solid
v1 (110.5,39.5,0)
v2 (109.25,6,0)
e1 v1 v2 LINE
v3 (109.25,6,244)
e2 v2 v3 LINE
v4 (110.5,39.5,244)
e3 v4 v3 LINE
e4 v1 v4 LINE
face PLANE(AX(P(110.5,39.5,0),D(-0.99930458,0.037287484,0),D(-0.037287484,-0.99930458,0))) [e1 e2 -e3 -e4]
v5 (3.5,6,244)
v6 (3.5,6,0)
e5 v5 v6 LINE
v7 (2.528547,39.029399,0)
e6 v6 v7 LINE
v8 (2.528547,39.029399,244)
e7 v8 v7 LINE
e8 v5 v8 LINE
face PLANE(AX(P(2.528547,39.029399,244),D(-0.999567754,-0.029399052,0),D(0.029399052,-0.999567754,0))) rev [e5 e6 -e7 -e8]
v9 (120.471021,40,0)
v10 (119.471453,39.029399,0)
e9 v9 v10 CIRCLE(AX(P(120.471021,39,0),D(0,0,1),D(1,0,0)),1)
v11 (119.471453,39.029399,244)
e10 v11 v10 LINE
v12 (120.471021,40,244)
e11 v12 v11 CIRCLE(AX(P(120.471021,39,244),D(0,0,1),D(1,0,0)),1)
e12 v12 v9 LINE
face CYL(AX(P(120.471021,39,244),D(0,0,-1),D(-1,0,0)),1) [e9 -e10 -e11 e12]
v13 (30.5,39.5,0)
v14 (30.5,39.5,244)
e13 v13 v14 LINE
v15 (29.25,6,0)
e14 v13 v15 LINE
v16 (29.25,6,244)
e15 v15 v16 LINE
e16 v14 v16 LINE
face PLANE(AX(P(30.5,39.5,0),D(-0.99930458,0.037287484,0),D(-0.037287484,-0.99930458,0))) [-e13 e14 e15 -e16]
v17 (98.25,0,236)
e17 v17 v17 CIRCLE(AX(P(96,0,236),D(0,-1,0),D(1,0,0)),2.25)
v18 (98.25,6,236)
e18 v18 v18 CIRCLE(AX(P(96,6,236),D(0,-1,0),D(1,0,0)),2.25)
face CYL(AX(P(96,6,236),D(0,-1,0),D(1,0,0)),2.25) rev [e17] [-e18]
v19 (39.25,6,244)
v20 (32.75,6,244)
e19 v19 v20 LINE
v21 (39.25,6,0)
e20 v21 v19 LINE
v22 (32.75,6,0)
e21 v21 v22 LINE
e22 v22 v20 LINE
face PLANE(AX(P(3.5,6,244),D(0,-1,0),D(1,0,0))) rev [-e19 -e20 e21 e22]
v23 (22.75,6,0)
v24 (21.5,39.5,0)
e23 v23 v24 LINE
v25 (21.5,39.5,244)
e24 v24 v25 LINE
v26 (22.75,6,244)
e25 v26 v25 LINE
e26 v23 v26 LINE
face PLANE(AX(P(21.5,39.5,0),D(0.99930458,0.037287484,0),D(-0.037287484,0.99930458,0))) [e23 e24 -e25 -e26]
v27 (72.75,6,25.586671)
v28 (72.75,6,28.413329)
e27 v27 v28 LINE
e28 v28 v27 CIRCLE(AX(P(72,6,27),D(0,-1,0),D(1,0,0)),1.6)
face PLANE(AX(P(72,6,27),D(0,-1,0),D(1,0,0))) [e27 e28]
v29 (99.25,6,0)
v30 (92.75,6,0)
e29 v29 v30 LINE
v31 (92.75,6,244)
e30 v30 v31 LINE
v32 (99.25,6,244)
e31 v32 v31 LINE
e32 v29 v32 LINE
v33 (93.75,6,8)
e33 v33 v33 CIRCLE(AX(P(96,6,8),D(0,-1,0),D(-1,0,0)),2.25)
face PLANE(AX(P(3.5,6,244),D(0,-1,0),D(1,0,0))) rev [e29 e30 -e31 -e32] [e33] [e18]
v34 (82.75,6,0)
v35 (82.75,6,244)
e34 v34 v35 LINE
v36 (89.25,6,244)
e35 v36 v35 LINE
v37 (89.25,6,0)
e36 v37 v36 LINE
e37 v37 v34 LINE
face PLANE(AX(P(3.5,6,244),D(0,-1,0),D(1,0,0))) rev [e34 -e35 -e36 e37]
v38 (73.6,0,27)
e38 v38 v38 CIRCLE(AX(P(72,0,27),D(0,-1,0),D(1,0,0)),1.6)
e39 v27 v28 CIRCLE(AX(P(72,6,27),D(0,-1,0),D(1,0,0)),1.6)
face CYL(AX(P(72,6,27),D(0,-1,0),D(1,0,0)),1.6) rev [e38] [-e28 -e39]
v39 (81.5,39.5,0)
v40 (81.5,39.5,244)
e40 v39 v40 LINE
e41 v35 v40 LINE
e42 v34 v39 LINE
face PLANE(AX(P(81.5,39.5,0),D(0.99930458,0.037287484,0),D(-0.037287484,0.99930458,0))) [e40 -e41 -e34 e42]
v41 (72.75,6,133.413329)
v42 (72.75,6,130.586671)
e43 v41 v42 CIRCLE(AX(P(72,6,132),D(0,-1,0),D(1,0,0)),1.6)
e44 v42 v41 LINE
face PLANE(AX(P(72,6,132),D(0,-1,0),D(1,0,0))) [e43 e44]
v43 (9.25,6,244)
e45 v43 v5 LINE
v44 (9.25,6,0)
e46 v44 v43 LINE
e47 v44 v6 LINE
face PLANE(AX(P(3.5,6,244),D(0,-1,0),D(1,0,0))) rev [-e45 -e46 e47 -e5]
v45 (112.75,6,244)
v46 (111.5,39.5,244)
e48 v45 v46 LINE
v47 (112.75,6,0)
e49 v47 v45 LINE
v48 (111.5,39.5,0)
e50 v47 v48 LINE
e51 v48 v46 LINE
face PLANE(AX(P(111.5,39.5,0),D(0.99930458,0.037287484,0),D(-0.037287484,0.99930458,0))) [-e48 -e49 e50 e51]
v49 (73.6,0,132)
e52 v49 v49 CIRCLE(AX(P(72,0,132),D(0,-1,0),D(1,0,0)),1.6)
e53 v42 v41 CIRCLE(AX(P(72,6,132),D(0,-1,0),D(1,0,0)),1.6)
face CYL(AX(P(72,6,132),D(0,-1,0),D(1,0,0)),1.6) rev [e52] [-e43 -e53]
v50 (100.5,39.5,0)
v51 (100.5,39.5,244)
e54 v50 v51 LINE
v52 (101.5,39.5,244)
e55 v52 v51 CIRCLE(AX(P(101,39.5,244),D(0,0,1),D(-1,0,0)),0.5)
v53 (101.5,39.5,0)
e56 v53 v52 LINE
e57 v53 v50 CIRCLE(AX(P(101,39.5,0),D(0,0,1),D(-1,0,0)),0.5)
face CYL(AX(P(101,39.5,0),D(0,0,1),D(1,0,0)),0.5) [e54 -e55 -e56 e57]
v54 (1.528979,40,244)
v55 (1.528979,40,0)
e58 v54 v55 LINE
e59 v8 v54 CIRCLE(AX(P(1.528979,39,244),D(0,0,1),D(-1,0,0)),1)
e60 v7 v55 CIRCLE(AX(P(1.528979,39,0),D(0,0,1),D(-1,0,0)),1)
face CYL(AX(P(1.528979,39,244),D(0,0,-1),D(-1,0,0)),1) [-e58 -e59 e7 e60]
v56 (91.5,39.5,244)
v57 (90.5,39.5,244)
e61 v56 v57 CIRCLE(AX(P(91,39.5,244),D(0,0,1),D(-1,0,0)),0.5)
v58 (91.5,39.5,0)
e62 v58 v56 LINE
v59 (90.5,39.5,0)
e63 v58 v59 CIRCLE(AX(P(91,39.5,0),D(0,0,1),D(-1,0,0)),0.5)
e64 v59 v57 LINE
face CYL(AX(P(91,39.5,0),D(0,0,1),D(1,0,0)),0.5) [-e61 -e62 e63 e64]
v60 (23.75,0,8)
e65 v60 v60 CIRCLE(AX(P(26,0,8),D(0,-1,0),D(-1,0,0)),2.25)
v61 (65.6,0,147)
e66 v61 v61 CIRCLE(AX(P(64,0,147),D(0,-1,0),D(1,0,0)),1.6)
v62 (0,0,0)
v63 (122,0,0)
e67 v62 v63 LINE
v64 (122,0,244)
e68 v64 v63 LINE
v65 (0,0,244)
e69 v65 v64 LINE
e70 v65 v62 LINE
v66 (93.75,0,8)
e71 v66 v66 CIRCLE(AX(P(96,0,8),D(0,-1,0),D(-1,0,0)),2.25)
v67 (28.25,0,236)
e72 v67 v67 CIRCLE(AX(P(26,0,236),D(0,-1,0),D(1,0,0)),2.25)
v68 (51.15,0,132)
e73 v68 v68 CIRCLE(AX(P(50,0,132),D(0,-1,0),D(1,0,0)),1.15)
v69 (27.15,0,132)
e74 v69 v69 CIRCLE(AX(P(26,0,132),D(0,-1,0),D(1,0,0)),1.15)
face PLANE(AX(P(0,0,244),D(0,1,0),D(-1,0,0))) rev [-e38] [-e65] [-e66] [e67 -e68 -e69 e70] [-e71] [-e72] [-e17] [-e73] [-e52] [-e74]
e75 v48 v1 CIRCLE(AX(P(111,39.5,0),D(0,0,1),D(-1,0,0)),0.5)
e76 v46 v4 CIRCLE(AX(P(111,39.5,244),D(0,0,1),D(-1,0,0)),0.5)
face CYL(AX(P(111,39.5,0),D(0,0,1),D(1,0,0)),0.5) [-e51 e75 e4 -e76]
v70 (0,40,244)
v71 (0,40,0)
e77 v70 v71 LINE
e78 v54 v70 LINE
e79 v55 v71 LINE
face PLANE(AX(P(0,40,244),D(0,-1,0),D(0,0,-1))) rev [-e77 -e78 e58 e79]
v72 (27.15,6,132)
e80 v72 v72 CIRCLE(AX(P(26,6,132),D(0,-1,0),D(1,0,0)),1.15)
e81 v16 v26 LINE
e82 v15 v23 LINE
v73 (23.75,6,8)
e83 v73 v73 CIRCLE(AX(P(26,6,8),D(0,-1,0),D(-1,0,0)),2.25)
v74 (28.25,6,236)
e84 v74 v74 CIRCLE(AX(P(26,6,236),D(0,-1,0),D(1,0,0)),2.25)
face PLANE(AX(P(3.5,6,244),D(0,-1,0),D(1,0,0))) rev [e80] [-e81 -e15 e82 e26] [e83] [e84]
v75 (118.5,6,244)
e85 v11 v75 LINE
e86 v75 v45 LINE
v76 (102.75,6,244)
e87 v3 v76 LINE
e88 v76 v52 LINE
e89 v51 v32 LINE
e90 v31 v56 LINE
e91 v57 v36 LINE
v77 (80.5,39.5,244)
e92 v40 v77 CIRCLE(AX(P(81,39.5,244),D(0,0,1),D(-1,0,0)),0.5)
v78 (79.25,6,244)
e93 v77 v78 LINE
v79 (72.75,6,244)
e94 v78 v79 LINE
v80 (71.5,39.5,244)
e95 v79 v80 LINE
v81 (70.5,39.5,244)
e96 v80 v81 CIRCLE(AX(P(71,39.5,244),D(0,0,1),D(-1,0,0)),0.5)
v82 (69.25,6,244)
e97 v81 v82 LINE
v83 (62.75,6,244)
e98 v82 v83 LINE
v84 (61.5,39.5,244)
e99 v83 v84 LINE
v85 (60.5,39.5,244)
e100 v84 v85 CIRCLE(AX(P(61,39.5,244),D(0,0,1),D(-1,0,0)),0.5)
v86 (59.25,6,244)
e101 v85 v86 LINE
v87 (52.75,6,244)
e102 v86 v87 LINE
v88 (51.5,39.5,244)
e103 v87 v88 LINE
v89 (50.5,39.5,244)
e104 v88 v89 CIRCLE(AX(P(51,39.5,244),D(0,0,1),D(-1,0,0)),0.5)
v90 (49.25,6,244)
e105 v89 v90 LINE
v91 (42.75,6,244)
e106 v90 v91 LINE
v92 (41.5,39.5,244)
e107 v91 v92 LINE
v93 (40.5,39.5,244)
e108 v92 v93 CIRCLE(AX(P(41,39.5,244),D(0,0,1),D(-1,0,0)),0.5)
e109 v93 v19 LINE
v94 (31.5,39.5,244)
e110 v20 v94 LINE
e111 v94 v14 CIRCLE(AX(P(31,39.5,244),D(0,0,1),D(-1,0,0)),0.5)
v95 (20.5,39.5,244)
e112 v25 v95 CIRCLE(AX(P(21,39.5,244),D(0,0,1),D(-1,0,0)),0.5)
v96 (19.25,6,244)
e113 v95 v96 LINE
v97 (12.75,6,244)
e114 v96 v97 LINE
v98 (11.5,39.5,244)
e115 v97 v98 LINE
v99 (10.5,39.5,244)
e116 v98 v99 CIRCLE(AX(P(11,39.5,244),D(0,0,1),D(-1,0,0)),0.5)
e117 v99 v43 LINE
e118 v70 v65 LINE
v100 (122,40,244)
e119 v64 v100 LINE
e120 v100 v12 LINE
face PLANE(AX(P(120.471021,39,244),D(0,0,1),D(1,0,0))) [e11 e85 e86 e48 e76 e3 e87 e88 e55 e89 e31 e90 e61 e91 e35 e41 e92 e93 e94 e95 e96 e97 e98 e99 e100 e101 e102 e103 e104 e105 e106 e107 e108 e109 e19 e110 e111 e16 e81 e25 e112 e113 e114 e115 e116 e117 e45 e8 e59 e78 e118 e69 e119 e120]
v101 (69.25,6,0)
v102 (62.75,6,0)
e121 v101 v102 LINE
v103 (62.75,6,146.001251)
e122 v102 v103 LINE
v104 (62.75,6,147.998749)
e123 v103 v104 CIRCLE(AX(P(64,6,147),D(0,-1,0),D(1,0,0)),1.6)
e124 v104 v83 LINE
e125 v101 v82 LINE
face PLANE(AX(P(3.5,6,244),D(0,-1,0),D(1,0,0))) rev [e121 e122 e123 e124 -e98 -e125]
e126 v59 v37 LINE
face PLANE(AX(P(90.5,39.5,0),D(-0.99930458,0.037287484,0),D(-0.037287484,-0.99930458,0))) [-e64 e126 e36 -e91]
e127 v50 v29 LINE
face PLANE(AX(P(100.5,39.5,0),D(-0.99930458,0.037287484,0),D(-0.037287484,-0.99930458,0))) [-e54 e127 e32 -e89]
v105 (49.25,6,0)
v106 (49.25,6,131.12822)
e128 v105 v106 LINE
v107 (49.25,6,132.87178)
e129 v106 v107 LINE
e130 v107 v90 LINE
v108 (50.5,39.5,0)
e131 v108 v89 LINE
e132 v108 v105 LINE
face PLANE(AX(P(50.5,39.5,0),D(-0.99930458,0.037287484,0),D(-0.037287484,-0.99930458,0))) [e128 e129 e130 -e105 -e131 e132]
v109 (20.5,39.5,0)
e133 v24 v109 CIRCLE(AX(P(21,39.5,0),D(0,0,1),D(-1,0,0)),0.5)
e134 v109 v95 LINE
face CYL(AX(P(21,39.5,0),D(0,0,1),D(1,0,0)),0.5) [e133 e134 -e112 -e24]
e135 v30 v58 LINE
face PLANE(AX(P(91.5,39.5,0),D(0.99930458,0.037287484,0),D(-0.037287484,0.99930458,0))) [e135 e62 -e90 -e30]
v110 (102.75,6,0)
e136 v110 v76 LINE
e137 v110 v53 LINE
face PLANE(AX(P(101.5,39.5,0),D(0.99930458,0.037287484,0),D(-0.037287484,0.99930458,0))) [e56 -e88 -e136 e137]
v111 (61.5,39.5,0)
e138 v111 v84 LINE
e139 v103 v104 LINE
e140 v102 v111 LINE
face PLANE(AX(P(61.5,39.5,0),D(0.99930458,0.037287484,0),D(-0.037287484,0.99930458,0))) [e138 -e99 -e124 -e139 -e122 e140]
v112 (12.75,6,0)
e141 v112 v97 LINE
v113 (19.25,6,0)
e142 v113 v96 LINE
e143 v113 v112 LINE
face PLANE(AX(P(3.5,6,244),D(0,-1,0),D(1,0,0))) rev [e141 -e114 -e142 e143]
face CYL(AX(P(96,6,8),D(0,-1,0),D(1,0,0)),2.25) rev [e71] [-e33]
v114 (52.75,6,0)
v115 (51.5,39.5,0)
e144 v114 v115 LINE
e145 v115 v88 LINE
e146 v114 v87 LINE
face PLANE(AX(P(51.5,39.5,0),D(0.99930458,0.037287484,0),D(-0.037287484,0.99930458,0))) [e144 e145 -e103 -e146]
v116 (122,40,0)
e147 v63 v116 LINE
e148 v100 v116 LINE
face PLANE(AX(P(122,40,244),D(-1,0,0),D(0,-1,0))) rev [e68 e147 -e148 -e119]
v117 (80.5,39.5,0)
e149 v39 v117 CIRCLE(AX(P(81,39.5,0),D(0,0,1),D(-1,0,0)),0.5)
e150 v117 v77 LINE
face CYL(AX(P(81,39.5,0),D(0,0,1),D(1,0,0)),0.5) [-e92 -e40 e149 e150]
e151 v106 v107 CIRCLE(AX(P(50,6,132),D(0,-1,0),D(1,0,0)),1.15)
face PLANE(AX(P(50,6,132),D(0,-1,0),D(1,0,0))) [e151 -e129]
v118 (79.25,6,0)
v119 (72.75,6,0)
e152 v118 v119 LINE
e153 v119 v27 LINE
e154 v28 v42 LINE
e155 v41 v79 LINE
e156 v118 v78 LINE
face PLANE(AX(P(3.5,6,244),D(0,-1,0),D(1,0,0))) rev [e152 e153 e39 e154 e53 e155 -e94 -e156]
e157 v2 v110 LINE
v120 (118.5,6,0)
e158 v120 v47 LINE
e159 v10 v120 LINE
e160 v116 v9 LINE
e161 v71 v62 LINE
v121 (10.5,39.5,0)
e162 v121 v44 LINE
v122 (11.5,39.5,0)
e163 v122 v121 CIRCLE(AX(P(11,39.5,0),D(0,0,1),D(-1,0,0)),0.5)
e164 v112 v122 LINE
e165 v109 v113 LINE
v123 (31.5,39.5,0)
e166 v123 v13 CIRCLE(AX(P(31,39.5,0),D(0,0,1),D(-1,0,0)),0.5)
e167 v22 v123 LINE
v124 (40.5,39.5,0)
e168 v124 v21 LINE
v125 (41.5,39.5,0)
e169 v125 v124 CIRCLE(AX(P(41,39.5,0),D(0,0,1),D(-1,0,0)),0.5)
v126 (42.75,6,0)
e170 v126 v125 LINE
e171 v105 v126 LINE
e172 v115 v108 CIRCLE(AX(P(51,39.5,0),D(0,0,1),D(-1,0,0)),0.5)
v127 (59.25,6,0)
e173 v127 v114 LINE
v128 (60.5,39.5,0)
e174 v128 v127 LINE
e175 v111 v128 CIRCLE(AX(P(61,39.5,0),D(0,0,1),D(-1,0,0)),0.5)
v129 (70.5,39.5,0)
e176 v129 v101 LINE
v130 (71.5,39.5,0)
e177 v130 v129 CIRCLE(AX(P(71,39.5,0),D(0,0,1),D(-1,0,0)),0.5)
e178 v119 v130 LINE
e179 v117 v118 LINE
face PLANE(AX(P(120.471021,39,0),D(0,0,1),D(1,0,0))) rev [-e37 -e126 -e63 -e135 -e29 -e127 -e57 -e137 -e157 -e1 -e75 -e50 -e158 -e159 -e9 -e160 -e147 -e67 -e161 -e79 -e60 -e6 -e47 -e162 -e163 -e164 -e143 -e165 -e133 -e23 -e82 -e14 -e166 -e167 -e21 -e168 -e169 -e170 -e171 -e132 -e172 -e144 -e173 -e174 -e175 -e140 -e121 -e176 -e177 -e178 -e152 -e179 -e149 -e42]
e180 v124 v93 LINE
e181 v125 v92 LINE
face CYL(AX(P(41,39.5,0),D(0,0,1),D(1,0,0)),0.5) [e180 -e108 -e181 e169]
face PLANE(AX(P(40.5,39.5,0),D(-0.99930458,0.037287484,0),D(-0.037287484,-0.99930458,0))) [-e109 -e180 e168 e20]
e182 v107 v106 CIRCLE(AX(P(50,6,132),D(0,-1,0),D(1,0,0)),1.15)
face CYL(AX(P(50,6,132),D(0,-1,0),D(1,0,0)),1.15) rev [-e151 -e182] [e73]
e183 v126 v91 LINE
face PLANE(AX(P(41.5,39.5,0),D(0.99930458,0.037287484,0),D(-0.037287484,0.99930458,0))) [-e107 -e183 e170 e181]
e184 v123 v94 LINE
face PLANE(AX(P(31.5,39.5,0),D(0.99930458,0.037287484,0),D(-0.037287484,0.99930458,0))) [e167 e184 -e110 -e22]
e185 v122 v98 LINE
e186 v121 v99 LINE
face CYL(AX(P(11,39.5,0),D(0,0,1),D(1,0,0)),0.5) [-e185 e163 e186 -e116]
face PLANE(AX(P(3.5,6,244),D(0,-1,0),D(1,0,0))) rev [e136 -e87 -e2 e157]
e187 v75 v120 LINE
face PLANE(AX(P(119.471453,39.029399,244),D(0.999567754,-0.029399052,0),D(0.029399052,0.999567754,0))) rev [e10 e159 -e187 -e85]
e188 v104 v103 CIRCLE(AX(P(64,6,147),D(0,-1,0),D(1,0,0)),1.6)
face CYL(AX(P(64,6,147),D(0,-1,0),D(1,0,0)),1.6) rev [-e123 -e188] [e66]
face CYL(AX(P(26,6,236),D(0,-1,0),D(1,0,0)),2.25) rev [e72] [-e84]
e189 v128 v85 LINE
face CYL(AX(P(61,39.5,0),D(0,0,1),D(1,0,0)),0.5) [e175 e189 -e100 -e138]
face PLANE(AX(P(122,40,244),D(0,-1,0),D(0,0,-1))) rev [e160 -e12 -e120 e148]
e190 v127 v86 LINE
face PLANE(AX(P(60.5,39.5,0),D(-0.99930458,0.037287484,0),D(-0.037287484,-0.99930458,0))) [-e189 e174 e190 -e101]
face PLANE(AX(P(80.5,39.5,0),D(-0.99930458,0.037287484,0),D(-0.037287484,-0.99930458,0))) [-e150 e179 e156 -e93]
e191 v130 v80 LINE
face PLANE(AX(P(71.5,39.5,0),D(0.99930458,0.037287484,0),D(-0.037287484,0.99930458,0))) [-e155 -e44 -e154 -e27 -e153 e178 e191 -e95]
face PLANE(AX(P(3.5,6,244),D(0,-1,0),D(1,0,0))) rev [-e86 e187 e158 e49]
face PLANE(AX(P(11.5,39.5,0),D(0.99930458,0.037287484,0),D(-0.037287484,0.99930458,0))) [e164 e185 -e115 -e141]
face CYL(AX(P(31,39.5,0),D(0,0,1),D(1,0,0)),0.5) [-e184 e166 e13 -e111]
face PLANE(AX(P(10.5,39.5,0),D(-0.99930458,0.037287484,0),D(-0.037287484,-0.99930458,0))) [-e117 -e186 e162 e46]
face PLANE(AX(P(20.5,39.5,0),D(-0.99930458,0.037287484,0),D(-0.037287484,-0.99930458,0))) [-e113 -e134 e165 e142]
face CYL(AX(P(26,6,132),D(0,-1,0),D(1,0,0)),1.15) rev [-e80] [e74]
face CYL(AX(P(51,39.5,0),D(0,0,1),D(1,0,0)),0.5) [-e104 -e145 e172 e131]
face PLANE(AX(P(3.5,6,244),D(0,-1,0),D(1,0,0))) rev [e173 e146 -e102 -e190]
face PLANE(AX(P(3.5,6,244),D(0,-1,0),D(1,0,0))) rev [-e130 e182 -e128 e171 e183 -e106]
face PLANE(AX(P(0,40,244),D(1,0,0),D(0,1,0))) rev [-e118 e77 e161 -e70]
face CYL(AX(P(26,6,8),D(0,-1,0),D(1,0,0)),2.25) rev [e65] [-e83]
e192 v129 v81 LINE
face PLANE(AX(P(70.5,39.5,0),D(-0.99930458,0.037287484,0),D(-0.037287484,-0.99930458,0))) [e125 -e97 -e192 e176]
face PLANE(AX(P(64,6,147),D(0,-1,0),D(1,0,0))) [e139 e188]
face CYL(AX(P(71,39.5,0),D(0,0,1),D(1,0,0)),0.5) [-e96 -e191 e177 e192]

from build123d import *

# Parameters (mm, degrees)
EXTRUDE_1_DEPTH       = 244
EXTRUDE_3_DEPTH       = 244
PATTERN_CURVE_1_COUNT = 11
PATTERN_CURVE_1_PITCH = 10
SKETCH_3_R            = 2.25
CUT_EXTRUDE_1_DEPTH   = 6
SKETCH_4_R            = 1.6
SKETCH_4_R_2          = 1.15
CUT_EXTRUDE_2_DEPTH   = 6


with BuildPart() as part:
    # Эскиз1 → Вытянуть1 (new body)
    with BuildSketch(Plane.XY):
        with BuildLine():
            Line((0, 40), (1.528979332, 40))
            ThreePointArc((1.528979332, 40), (2.225614441, 39.717425624), (2.528547087, 39.029399052))
            Line((2.528547087, 39.029399052), (3.5, 6))
            Line((3.5, 6), (118.5, 6))
            Line((118.5, 6), (119.471452913, 39.029399052))
            ThreePointArc((119.471452913, 39.029399052), (119.774385559, 39.717425624), (120.471020668, 40))
            Line((120.471020668, 40), (122, 40))
            Line((122, 40), (122, 0))
            Line((122, 0), (0, 0))
            Line((0, 0), (0, 40))
        make_face()
    extrude(amount=EXTRUDE_1_DEPTH)

    # Эскиз2 → Вытянуть3 (add)
    with BuildSketch(Plane.XY.offset(244)):
        with BuildLine():
            Line((10.5, 39.5), (9.25, 6))
            Line((9.25, 6), (12.75, 6))
            Line((12.75, 6), (11.5, 39.5))
            ThreePointArc((11.5, 39.5), (11, 40), (10.5, 39.5))
        make_face()
    extrude_3 = extrude(amount=-EXTRUDE_3_DEPTH)

    # Кривая1: Вытянуть3 ×11
    with Locations(*[(i * PATTERN_CURVE_1_PITCH, 0, 0) for i in range(1, PATTERN_CURVE_1_COUNT)]):
        add(extrude_3)

    # Эскиз3 → Вырез-Вытянуть1 (cut)
    with BuildSketch(Plane.XZ):
        with Locations((26, 236)):
            Circle(SKETCH_3_R)
        with Locations((96, 236)):
            Circle(SKETCH_3_R)
        with Locations((96, 8)):
            Circle(SKETCH_3_R)
        with Locations((26, 8)):
            Circle(SKETCH_3_R)
    extrude(amount=-CUT_EXTRUDE_1_DEPTH, mode=Mode.SUBTRACT)

    # Эскиз4 → Вырез-Вытянуть2 (cut)
    with BuildSketch(Plane(origin=(133.240090243, 0, 310.149074448), x_dir=(-1, 0, 0), z_dir=(0, -1, 0))):
        with Locations((8.990090243, 225.549074448)):
            Circle(SKETCH_4_R)
        with Locations((83.240090243, 178.149074448)):
            Circle(SKETCH_4_R_2)
        with Locations((69.240090243, 163.149074448)):
            Circle(SKETCH_4_R)
        with Locations((61.240090243, 283.149074448)):
            Circle(SKETCH_4_R)
        with Locations((61.240090243, 178.149074448)):
            Circle(SKETCH_4_R)
        with Locations((107.240090243, 178.149074448)):
            Circle(SKETCH_4_R_2)
    extrude(amount=-CUT_EXTRUDE_2_DEPTH, mode=Mode.SUBTRACT)


solid = part.part
